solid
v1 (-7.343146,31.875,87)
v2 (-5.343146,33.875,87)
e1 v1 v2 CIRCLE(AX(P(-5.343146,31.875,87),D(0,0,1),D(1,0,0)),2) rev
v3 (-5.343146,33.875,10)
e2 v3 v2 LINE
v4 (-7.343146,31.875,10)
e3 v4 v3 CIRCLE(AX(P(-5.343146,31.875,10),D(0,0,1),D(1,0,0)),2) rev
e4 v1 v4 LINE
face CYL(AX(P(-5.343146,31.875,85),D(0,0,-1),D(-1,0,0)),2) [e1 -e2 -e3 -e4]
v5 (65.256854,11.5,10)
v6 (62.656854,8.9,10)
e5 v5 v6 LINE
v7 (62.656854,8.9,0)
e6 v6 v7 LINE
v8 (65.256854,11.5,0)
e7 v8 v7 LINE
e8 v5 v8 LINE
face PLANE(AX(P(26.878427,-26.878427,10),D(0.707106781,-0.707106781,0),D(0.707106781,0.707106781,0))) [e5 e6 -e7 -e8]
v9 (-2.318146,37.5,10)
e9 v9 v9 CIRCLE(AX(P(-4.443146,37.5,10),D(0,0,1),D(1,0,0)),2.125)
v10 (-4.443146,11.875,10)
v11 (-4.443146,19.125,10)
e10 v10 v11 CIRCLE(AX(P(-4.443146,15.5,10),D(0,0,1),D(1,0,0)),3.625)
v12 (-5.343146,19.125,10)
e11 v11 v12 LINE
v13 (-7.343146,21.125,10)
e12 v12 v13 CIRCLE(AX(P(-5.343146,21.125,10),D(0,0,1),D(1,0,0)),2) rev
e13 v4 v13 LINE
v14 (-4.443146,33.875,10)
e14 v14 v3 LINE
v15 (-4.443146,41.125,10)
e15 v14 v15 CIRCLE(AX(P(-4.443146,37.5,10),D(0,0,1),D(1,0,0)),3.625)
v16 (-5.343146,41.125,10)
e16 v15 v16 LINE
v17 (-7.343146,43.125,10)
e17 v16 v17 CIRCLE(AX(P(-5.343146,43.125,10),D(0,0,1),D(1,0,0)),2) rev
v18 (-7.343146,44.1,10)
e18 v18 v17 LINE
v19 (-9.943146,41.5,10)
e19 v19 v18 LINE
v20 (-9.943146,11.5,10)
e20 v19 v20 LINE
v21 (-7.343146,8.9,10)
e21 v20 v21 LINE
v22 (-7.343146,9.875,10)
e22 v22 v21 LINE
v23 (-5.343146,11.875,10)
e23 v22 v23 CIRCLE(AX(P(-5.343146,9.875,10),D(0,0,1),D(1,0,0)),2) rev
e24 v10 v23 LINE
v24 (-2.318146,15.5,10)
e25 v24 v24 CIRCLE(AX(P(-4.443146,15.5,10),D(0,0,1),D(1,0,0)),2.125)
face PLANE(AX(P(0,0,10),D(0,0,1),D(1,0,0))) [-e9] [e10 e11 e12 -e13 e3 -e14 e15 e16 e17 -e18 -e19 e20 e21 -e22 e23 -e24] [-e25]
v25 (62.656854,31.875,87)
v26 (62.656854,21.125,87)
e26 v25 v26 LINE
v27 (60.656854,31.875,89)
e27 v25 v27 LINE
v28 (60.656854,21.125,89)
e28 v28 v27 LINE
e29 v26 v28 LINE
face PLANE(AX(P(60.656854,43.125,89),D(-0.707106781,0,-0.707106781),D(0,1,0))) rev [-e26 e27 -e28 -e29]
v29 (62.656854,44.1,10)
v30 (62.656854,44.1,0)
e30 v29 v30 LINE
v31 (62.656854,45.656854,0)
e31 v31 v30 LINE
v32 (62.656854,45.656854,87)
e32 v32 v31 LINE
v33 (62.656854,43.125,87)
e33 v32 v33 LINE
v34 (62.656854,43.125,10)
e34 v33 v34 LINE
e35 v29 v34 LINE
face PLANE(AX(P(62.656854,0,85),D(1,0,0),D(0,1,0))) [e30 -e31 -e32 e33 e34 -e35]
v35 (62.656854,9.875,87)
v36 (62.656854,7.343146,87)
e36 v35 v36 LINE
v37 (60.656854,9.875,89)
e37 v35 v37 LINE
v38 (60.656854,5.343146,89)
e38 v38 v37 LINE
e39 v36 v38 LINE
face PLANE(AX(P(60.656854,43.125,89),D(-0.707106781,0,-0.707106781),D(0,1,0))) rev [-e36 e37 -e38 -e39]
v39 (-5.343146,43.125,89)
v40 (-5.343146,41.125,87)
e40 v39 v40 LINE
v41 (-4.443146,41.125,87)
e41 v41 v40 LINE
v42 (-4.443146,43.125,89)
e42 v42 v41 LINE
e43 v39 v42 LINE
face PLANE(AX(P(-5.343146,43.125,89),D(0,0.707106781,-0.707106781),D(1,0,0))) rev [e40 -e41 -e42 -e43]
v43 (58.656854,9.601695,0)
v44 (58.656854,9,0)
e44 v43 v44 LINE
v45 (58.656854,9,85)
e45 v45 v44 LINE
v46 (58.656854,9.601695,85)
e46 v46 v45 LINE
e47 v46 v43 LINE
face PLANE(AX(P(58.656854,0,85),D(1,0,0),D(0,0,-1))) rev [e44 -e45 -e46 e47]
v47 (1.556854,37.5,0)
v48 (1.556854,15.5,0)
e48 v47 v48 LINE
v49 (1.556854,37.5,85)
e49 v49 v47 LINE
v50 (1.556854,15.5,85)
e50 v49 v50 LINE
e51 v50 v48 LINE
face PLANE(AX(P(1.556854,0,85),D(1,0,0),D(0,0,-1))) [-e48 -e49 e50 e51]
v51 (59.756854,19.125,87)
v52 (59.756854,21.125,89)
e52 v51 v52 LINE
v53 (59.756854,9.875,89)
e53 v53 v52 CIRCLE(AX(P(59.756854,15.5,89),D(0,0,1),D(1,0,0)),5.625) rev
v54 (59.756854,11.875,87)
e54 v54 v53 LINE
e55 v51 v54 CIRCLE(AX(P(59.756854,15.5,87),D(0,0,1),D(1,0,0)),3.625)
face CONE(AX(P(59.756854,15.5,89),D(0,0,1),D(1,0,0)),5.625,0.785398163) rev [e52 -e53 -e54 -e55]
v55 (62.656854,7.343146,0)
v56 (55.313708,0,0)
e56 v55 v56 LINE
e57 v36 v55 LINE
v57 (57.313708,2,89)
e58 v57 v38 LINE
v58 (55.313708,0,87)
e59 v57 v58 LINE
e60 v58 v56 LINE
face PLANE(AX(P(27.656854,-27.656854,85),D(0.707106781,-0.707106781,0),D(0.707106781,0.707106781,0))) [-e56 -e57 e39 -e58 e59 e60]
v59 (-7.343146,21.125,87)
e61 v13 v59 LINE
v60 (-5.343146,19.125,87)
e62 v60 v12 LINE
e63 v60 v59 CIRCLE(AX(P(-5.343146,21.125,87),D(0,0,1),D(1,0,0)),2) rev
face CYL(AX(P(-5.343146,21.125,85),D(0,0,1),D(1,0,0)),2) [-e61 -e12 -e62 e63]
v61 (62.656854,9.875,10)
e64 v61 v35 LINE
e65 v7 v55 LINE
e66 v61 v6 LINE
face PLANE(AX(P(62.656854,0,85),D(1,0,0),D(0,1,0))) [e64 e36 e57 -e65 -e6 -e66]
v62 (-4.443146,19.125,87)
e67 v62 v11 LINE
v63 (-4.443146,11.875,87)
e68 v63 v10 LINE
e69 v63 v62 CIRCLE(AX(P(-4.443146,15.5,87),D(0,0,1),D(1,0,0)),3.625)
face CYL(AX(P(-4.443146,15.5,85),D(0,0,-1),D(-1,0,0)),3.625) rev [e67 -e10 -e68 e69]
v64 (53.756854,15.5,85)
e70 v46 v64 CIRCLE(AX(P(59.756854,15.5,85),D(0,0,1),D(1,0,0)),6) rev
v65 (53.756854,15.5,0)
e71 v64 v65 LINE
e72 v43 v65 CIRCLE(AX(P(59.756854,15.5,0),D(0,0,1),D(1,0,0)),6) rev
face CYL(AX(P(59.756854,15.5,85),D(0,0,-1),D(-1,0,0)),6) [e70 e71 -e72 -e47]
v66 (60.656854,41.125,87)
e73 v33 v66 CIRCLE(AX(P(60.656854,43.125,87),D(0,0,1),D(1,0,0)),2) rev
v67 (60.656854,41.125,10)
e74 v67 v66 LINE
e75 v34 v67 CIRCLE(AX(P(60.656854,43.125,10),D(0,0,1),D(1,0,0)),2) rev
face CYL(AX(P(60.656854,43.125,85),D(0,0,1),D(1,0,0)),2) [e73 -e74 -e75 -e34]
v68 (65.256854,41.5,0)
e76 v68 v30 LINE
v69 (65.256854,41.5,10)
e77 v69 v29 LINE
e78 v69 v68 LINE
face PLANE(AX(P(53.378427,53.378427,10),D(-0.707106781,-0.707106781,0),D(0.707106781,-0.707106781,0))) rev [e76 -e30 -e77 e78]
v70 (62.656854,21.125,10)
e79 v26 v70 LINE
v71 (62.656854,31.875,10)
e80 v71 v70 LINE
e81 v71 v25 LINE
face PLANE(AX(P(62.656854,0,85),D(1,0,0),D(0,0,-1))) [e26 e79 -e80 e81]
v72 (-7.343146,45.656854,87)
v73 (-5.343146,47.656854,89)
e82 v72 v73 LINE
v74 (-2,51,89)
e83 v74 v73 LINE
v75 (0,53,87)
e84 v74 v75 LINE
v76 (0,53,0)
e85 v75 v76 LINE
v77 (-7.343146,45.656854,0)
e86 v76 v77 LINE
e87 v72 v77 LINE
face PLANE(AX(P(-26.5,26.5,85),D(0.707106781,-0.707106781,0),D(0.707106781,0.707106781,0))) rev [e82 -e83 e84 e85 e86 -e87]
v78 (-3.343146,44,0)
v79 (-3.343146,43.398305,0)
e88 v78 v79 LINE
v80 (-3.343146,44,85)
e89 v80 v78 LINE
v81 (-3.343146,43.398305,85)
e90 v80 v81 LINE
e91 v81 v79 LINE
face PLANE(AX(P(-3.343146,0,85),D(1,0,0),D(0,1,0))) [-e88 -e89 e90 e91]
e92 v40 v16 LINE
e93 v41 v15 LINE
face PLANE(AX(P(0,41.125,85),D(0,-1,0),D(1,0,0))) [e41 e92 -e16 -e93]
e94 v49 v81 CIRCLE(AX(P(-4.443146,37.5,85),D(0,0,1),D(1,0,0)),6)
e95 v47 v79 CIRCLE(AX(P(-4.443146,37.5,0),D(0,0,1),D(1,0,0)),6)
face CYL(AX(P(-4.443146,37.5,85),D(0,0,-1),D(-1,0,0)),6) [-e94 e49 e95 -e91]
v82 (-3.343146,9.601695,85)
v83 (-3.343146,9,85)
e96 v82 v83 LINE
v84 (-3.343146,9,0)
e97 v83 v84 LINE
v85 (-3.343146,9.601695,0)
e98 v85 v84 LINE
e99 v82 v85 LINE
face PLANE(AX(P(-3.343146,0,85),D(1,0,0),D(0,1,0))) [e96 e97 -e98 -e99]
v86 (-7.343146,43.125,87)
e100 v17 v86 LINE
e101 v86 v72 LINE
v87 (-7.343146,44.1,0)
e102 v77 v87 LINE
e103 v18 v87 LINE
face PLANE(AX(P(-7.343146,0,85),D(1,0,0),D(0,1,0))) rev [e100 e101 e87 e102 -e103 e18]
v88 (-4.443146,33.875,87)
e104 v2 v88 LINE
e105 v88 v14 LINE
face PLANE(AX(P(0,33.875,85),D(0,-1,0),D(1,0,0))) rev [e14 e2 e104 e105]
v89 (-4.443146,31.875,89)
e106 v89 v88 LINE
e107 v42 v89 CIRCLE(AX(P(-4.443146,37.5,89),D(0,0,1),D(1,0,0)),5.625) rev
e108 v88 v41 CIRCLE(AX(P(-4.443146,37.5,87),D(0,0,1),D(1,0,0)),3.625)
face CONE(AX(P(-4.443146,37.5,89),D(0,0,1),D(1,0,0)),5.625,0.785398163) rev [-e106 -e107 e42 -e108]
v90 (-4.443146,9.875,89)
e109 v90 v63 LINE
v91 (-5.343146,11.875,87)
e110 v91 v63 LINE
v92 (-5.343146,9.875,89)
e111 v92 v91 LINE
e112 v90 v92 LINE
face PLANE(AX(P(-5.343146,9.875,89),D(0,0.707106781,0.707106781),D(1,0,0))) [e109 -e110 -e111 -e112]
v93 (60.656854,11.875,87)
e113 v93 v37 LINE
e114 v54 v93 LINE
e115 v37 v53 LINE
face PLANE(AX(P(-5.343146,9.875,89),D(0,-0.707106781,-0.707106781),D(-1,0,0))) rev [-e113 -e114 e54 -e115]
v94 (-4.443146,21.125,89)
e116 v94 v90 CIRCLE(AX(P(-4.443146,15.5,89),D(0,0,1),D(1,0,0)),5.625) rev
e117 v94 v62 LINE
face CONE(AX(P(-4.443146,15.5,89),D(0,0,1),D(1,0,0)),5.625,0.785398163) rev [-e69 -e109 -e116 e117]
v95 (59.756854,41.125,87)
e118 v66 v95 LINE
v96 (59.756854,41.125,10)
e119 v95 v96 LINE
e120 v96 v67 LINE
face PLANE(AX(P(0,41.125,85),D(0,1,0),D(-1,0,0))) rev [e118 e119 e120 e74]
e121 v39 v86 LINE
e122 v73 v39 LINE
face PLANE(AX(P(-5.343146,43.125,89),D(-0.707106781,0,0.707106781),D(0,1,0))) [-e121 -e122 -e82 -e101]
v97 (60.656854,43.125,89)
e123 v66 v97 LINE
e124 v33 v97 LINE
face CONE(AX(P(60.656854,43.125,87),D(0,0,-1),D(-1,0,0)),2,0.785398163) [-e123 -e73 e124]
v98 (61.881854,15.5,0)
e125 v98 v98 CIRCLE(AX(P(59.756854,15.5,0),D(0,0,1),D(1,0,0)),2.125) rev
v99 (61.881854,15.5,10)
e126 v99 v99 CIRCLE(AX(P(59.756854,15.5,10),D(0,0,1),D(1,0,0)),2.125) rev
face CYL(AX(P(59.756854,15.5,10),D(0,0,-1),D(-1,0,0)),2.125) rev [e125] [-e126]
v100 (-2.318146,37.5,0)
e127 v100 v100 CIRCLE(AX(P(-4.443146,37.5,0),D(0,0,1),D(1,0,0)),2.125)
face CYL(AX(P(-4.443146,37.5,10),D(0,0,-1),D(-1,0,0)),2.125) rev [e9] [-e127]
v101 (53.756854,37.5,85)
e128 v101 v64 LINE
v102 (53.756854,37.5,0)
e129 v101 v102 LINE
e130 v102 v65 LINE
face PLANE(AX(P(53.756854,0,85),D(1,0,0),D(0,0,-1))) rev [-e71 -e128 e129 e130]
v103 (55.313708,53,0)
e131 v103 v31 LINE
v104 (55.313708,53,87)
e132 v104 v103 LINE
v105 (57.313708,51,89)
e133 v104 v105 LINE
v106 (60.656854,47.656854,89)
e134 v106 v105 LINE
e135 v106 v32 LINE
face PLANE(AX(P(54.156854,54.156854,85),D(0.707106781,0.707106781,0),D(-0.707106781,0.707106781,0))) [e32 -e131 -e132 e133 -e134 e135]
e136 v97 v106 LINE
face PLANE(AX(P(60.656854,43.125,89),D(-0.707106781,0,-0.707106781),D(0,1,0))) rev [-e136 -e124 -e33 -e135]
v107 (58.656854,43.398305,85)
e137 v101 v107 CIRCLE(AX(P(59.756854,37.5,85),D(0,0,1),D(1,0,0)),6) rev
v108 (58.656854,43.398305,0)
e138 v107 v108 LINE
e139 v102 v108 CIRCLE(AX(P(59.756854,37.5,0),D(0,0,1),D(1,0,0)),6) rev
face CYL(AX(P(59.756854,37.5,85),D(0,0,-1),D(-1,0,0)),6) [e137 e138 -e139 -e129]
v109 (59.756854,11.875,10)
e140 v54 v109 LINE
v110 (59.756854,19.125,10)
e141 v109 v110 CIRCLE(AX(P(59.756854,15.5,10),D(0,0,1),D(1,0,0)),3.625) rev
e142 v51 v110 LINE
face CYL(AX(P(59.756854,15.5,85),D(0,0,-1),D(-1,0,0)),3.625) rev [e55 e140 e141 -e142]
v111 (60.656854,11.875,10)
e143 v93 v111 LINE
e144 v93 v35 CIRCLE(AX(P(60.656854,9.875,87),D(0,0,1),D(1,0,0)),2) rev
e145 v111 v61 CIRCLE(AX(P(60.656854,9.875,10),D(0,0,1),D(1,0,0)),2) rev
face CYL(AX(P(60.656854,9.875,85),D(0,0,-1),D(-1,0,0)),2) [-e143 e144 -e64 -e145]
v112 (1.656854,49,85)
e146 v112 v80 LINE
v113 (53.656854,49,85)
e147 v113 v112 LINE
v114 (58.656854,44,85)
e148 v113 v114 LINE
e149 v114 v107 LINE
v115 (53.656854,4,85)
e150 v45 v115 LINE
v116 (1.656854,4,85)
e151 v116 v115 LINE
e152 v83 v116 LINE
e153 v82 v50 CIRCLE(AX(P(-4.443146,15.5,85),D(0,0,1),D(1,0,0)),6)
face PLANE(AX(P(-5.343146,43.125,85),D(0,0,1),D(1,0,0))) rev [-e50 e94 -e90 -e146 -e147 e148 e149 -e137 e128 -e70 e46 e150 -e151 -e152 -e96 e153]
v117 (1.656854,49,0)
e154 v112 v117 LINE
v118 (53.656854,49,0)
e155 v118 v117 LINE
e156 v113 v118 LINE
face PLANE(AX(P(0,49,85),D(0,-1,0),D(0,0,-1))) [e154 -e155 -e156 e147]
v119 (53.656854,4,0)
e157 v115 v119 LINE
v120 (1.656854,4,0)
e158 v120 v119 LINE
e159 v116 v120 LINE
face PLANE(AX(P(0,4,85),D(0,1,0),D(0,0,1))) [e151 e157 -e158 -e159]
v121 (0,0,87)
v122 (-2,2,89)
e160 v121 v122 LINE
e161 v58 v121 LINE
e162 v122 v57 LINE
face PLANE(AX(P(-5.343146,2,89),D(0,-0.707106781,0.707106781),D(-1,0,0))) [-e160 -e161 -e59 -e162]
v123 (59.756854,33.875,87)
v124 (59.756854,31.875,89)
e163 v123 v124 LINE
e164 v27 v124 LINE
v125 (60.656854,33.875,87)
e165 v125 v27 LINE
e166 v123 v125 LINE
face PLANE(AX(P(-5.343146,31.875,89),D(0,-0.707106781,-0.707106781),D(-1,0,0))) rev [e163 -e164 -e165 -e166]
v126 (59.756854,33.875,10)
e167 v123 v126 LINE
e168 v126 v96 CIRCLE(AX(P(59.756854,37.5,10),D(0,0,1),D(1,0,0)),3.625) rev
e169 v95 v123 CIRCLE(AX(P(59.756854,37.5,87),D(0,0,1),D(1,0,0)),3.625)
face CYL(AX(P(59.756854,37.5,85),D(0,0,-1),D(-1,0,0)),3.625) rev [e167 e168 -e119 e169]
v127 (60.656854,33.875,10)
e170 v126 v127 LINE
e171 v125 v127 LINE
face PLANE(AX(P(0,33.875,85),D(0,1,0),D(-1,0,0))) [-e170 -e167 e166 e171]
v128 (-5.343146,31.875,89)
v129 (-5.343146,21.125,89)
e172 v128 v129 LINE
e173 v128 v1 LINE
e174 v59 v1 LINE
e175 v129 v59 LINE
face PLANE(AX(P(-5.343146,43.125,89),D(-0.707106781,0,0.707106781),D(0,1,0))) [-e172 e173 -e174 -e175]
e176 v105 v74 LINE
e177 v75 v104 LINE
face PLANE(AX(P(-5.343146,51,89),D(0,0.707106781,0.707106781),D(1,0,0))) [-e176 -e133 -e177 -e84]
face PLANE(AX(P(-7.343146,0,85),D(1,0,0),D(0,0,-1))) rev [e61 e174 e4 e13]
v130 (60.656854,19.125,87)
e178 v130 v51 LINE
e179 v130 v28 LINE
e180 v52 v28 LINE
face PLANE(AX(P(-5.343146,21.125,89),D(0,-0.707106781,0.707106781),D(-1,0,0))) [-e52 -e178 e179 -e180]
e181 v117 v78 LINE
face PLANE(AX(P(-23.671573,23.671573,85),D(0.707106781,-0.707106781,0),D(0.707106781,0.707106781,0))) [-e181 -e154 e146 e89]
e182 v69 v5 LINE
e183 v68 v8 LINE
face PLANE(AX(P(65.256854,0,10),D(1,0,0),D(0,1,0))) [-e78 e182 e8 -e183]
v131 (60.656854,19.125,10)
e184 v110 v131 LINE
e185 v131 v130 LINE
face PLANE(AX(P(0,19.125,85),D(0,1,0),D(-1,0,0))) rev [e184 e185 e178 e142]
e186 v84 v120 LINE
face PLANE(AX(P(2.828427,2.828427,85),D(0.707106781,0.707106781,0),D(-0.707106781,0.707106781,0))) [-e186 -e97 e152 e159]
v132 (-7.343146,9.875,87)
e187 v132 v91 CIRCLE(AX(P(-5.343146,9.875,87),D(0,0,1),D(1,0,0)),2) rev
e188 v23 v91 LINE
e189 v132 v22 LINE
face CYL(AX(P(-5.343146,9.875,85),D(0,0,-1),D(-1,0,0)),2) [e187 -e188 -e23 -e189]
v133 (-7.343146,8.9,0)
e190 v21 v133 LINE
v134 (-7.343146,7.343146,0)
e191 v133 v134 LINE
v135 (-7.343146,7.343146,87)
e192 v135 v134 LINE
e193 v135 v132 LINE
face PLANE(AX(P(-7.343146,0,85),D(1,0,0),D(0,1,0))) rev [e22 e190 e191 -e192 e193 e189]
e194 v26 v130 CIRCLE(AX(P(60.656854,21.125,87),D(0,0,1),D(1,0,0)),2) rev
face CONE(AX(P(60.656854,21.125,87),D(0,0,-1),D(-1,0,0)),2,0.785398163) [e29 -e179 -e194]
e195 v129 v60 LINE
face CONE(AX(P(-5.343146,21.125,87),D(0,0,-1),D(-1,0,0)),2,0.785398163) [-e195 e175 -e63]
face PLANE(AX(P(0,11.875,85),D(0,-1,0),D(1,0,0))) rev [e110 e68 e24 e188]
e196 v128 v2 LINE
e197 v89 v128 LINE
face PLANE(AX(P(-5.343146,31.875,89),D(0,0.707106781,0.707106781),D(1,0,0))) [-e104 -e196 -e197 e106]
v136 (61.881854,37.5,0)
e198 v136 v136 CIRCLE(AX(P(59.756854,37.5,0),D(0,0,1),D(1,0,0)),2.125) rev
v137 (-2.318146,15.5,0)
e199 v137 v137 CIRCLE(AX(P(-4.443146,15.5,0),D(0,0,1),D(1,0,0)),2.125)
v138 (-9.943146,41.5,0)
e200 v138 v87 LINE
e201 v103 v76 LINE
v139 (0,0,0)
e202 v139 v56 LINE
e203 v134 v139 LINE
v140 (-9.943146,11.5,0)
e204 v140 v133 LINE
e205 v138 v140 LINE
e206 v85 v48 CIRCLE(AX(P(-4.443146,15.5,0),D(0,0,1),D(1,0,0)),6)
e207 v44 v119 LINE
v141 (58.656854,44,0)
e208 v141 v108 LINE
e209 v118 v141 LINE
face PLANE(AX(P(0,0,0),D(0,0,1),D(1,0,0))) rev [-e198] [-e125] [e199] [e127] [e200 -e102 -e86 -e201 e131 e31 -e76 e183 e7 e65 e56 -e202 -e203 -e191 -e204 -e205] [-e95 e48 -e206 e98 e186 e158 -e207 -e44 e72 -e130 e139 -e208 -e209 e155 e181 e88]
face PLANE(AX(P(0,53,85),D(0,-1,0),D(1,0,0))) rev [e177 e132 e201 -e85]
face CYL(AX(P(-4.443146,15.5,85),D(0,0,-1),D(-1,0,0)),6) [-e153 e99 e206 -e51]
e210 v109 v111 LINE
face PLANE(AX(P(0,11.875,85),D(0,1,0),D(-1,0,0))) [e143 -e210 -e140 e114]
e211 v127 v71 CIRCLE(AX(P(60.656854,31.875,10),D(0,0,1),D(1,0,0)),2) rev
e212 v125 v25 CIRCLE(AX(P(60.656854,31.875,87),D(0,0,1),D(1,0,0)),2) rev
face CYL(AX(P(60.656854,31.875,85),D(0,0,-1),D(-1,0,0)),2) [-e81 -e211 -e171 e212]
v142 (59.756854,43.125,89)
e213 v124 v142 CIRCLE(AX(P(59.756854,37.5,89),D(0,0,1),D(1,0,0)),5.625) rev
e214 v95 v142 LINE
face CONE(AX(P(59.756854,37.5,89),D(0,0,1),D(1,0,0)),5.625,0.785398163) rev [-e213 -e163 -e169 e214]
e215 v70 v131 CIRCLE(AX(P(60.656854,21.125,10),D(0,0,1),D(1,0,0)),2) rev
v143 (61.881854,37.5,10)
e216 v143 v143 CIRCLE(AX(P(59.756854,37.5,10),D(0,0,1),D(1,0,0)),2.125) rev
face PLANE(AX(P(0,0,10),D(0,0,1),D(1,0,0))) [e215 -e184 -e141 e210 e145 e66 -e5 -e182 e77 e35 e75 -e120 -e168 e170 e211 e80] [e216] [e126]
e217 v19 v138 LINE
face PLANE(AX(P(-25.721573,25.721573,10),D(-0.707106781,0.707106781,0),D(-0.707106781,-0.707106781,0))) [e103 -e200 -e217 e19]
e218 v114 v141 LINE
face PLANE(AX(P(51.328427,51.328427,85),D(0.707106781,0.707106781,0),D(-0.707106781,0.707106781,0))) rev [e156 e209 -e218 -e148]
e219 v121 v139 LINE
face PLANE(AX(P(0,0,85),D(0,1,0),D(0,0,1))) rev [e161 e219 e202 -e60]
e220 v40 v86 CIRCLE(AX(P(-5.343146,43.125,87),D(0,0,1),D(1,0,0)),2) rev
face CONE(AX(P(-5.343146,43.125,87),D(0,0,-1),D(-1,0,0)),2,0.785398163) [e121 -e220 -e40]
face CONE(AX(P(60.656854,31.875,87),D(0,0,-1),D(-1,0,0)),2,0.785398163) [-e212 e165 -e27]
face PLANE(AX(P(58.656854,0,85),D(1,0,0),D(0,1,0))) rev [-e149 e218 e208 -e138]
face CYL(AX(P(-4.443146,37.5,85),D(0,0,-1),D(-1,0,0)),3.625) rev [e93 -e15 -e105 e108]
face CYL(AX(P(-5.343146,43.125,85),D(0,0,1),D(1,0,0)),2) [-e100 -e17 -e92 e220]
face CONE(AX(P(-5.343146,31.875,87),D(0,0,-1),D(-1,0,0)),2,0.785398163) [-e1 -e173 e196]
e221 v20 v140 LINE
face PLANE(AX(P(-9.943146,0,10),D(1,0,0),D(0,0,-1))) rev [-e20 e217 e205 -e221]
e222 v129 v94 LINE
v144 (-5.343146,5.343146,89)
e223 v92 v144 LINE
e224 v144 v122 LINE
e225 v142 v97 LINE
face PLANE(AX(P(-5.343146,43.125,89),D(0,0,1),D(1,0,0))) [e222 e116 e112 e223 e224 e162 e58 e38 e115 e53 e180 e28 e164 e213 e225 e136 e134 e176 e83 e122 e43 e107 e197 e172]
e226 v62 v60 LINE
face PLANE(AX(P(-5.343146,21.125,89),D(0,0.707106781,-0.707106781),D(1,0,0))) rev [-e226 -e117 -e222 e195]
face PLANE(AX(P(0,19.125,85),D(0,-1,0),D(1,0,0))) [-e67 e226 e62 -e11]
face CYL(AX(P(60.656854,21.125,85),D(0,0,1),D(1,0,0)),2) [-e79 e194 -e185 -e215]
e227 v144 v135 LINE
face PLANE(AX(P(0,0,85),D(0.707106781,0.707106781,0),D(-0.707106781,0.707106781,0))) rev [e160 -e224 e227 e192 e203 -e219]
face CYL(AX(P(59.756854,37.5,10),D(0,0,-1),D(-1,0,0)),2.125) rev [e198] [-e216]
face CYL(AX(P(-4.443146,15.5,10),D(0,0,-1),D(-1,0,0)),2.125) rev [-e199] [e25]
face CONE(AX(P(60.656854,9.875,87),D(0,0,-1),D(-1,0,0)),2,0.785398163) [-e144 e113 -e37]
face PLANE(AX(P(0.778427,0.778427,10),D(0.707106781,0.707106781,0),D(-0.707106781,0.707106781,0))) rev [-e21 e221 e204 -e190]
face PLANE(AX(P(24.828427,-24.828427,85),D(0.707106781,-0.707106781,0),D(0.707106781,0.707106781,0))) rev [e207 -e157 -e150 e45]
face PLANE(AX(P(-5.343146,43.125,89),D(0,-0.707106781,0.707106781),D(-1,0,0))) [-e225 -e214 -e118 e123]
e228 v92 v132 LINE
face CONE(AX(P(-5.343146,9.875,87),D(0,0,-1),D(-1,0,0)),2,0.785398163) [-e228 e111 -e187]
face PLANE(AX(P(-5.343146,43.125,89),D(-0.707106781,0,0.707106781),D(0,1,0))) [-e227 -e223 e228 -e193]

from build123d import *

# Parameters (mm, degrees)
BOSS_EXTRUDE1_DEPTH = 85
SKETCH1_3_R         = 2.125
BOSS_EXTRUDE2_DEPTH = 10
FILLET1_R           = 2
BOSS_EXTRUDE3_START = 4
BOSS_EXTRUDE3_DEPTH = 4
CHAMFER1_SIZE       = 2


with BuildPart() as part:
    # Sketch1 → Boss-Extrude1 (new body)
    with BuildSketch(Plane.XY):
        with BuildLine():
            Line((55.313708499, 53), (0, 53))
            Line((0, 53), (-7.343145751, 45.656854249))
            Line((-7.343145751, 45.656854249), (-7.343145751, 41.125))
            Line((-7.343145751, 41.125), (-4.443145751, 41.125))
            ThreePointArc((-4.443145751, 41.125), (-0.818145751, 37.5), (-4.443145751, 33.875))
            Line((-4.443145751, 33.875), (-7.343145751, 33.875))
            Line((-7.343145751, 33.875), (-7.343145751, 19.125))
            Line((-7.343145751, 19.125), (-4.443145751, 19.125))
            ThreePointArc((-4.443145751, 19.125), (-0.818145751, 15.5), (-4.443145751, 11.875))
            Line((-4.443145751, 11.875), (-7.343145751, 11.875))
            Line((-7.343145751, 11.875), (-7.343145751, 7.343145751))
            Line((-7.343145751, 7.343145751), (0, 0))
            Line((0, 0), (55.313708499, 0))
            Line((55.313708499, 0), (62.656854249, 7.343145751))
            Line((62.656854249, 7.343145751), (62.656854249, 11.875))
            Line((62.656854249, 11.875), (59.756854249, 11.875))
            ThreePointArc((59.756854249, 11.875), (56.131854249, 15.5), (59.756854249, 19.125))
            Line((59.756854249, 19.125), (62.656854249, 19.125))
            Line((62.656854249, 19.125), (62.656854249, 33.875))
            Line((62.656854249, 33.875), (59.756854249, 33.875))
            ThreePointArc((59.756854249, 33.875), (56.131854249, 37.5), (59.756854249, 41.125))
            Line((59.756854249, 41.125), (62.656854249, 41.125))
            Line((62.656854249, 41.125), (62.656854249, 45.656854249))
            Line((62.656854249, 45.656854249), (55.313708499, 53))
        make_face()
        with BuildLine():
            Line((53.656854249, 4), (1.656854249, 4))
            Line((1.656854249, 4), (-3.343145751, 9))
            Line((-3.343145751, 9), (-3.343145751, 9.601695159))
            ThreePointArc((-3.343145751, 9.601695159), (0.172046553, 11.665942097), (1.556854249, 15.5))
            Line((1.556854249, 15.5), (1.556854249, 37.5))
            ThreePointArc((1.556854249, 37.5), (0.172046553, 41.334057903), (-3.343145751, 43.398304841))
            Line((-3.343145751, 43.398304841), (-3.343145751, 44))
            Line((-3.343145751, 44), (1.656854249, 49))
            Line((1.656854249, 49), (53.656854249, 49))
            Line((53.656854249, 49), (58.656854249, 44))
            Line((58.656854249, 44), (58.656854249, 43.398304841))
            ThreePointArc((58.656854249, 43.398304841), (55.141661946, 41.334057903), (53.756854249, 37.5))
            Line((53.756854249, 37.5), (53.756854249, 15.5))
            ThreePointArc((53.756854249, 15.5), (55.141661946, 11.665942097), (58.656854249, 9.601695159))
            Line((58.656854249, 9.601695159), (58.656854249, 9))
            Line((58.656854249, 9), (53.656854249, 4))
        make_face(mode=Mode.SUBTRACT)
    extrude(amount=BOSS_EXTRUDE1_DEPTH)

    # Sketch1<3> → Boss-Extrude2 (add)
    # profile 1 of 2: a face of its own
    with BuildSketch(Plane.XY):
        with BuildLine():
            ThreePointArc((-4.443145751, 33.875), (-0.818145751, 37.5), (-4.443145751, 41.125))
            Line((-4.443145751, 41.125), (-7.343145751, 41.125))
            Line((-7.343145751, 41.125), (-7.343145751, 44.1))
            Line((-7.343145751, 44.1), (-9.943145751, 41.5))
            Line((-9.943145751, 41.5), (-9.943145751, 11.5))
            Line((-9.943145751, 11.5), (-7.343145751, 8.9))
            Line((-7.343145751, 8.9), (-7.343145751, 11.875))
            Line((-7.343145751, 11.875), (-4.443145751, 11.875))
            ThreePointArc((-4.443145751, 11.875), (-0.818145751, 15.5), (-4.443145751, 19.125))
            Line((-4.443145751, 19.125), (-7.343145751, 19.125))
            Line((-7.343145751, 19.125), (-7.343145751, 33.875))
            Line((-7.343145751, 33.875), (-4.443145751, 33.875))
        make_face()
        with Locations((-4.443145751, 15.5)):
            Circle(SKETCH1_3_R, mode=Mode.SUBTRACT)
        with Locations((-4.443145751, 37.5)):
            Circle(SKETCH1_3_R, mode=Mode.SUBTRACT)
    # profile 2 of 2: a face of its own
    with BuildSketch(Plane.XY):
        with BuildLine():
            Line((65.256854249, 41.5), (62.656854249, 44.1))
            Line((62.656854249, 44.1), (62.656854249, 41.125))
            Line((62.656854249, 41.125), (59.756854249, 41.125))
            ThreePointArc((59.756854249, 41.125), (56.131854249, 37.5), (59.756854249, 33.875))
            Line((59.756854249, 33.875), (62.656854249, 33.875))
            Line((62.656854249, 33.875), (62.656854249, 19.125))
            Line((62.656854249, 19.125), (59.756854249, 19.125))
            ThreePointArc((59.756854249, 19.125), (56.131854249, 15.5), (59.756854249, 11.875))
            Line((59.756854249, 11.875), (62.656854249, 11.875))
            Line((62.656854249, 11.875), (62.656854249, 8.9))
            Line((62.656854249, 8.9), (65.256854249, 11.5))
            Line((65.256854249, 11.5), (65.256854249, 41.5))
        make_face()
        with Locations((59.756854249, 37.5)):
            Circle(SKETCH1_3_R, mode=Mode.SUBTRACT)
        with Locations((59.756854249, 15.5)):
            Circle(SKETCH1_3_R, mode=Mode.SUBTRACT)
    extrude(amount=BOSS_EXTRUDE2_DEPTH)

    # Fillet1
    fillet1_edges = [part.edges().sort_by_distance(p)[0] for p in [
        (62.656854249, 41.125, 47.5),
        (62.656854249, 33.875, 47.5),
        (62.656854249, 19.125, 47.5),
        (62.656854249, 11.875, 47.5),
        (-7.343145751, 11.875, 47.5),
        (-7.343145751, 19.125, 47.5),
        (-7.343145751, 33.875, 47.5),
        (-7.343145751, 41.125, 47.5),
    ]]
    fillet(fillet1_edges, radius=FILLET1_R)

    # Sketch2 → Boss-Extrude3 (add)
    with BuildSketch(Plane.XY.offset(85).offset(BOSS_EXTRUDE3_START)):
        with BuildLine():
            Line((-7.343145751, 31.875), (-7.343145751, 21.125))
            ThreePointArc((-7.343145751, 21.125), (-6.757359313, 19.710786438), (-5.343145751, 19.125))
            Line((-5.343145751, 19.125), (-4.443145751, 19.125))
            ThreePointArc((-4.443145751, 19.125), (-0.818145751, 15.5), (-4.443145751, 11.875))
            Line((-4.443145751, 11.875), (-5.343145751, 11.875))
            ThreePointArc((-5.343145751, 11.875), (-6.757359313, 11.289213562), (-7.343145751, 9.875))
            Line((-7.343145751, 9.875), (-7.343145751, 7.343145751))
            Line((-7.343145751, 7.343145751), (0, 0))
            Line((0, 0), (55.313708499, 0))
            Line((55.313708499, 0), (62.656854249, 7.343145751))
            Line((62.656854249, 7.343145751), (62.656854249, 9.875))
            ThreePointArc((62.656854249, 9.875), (62.071067812, 11.289213562), (60.656854249, 11.875))
            Line((60.656854249, 11.875), (59.756854249, 11.875))
            ThreePointArc((59.756854249, 11.875), (56.131854249, 15.5), (59.756854249, 19.125))
            Line((59.756854249, 19.125), (60.656854249, 19.125))
            ThreePointArc((60.656854249, 19.125), (62.071067812, 19.710786438), (62.656854249, 21.125))
            Line((62.656854249, 21.125), (62.656854249, 31.875))
            ThreePointArc((62.656854249, 31.875), (62.071067812, 33.289213562), (60.656854249, 33.875))
            Line((60.656854249, 33.875), (59.756854249, 33.875))
            ThreePointArc((59.756854249, 33.875), (56.131854249, 37.5), (59.756854249, 41.125))
            Line((59.756854249, 41.125), (60.656854249, 41.125))
            ThreePointArc((60.656854249, 41.125), (62.071067812, 41.710786438), (62.656854249, 43.125))
            Line((62.656854249, 43.125), (62.656854249, 45.656854249))
            Line((62.656854249, 45.656854249), (55.313708499, 53))
            Line((55.313708499, 53), (0, 53))
            Line((0, 53), (-7.343145751, 45.656854249))
            Line((-7.343145751, 45.656854249), (-7.343145751, 43.125))
            ThreePointArc((-7.343145751, 43.125), (-6.757359313, 41.710786438), (-5.343145751, 41.125))
            Line((-5.343145751, 41.125), (-4.443145751, 41.125))
            ThreePointArc((-4.443145751, 41.125), (-0.818145751, 37.5), (-4.443145751, 33.875))
            Line((-4.443145751, 33.875), (-5.343145751, 33.875))
            ThreePointArc((-5.343145751, 33.875), (-6.757359313, 33.289213562), (-7.343145751, 31.875))
        make_face()
    extrude(amount=-BOSS_EXTRUDE3_DEPTH)

    # Chamfer1
    chamfer1_edges = [part.edges().sort_by_distance(p)[0] for p in [
        (-7.343145751, 44.390927125, 89),
        (-6.757359313, 41.710786438, 89),
        (-4.893145751, 41.125, 89),
        (-0.818145751, 37.5, 89),
        (-4.893145751, 33.875, 89),
        (-6.757359313, 33.289213562, 89),
        (-7.343145751, 26.5, 89),
        (-6.757359313, 19.710786438, 89),
        (-4.893145751, 19.125, 89),
        (-0.818145751, 15.5, 89),
        (-4.893145751, 11.875, 89),
        (-6.757359313, 11.289213562, 89),
        (-7.343145751, 8.609072875, 89),
        (27.656854249, 0, 89),
        (62.656854249, 8.609072875, 89),
        (62.071067812, 11.289213562, 89),
        (60.206854249, 11.875, 89),
        (56.131854249, 15.5, 89),
        (60.206854249, 19.125, 89),
        (62.071067812, 19.710786438, 89),
        (62.656854249, 26.5, 89),
        (62.071067812, 33.289213562, 89),
        (60.206854249, 33.875, 89),
        (56.131854249, 37.5, 89),
        (60.206854249, 41.125, 89),
        (62.071067812, 41.710786438, 89),
        (62.656854249, 44.390927125, 89),
        (27.656854249, 53, 89),
    ]]
    chamfer(chamfer1_edges, length=CHAMFER1_SIZE - 0.0001)  # a hair under: the kernel refuses the full size


solid = part.part
